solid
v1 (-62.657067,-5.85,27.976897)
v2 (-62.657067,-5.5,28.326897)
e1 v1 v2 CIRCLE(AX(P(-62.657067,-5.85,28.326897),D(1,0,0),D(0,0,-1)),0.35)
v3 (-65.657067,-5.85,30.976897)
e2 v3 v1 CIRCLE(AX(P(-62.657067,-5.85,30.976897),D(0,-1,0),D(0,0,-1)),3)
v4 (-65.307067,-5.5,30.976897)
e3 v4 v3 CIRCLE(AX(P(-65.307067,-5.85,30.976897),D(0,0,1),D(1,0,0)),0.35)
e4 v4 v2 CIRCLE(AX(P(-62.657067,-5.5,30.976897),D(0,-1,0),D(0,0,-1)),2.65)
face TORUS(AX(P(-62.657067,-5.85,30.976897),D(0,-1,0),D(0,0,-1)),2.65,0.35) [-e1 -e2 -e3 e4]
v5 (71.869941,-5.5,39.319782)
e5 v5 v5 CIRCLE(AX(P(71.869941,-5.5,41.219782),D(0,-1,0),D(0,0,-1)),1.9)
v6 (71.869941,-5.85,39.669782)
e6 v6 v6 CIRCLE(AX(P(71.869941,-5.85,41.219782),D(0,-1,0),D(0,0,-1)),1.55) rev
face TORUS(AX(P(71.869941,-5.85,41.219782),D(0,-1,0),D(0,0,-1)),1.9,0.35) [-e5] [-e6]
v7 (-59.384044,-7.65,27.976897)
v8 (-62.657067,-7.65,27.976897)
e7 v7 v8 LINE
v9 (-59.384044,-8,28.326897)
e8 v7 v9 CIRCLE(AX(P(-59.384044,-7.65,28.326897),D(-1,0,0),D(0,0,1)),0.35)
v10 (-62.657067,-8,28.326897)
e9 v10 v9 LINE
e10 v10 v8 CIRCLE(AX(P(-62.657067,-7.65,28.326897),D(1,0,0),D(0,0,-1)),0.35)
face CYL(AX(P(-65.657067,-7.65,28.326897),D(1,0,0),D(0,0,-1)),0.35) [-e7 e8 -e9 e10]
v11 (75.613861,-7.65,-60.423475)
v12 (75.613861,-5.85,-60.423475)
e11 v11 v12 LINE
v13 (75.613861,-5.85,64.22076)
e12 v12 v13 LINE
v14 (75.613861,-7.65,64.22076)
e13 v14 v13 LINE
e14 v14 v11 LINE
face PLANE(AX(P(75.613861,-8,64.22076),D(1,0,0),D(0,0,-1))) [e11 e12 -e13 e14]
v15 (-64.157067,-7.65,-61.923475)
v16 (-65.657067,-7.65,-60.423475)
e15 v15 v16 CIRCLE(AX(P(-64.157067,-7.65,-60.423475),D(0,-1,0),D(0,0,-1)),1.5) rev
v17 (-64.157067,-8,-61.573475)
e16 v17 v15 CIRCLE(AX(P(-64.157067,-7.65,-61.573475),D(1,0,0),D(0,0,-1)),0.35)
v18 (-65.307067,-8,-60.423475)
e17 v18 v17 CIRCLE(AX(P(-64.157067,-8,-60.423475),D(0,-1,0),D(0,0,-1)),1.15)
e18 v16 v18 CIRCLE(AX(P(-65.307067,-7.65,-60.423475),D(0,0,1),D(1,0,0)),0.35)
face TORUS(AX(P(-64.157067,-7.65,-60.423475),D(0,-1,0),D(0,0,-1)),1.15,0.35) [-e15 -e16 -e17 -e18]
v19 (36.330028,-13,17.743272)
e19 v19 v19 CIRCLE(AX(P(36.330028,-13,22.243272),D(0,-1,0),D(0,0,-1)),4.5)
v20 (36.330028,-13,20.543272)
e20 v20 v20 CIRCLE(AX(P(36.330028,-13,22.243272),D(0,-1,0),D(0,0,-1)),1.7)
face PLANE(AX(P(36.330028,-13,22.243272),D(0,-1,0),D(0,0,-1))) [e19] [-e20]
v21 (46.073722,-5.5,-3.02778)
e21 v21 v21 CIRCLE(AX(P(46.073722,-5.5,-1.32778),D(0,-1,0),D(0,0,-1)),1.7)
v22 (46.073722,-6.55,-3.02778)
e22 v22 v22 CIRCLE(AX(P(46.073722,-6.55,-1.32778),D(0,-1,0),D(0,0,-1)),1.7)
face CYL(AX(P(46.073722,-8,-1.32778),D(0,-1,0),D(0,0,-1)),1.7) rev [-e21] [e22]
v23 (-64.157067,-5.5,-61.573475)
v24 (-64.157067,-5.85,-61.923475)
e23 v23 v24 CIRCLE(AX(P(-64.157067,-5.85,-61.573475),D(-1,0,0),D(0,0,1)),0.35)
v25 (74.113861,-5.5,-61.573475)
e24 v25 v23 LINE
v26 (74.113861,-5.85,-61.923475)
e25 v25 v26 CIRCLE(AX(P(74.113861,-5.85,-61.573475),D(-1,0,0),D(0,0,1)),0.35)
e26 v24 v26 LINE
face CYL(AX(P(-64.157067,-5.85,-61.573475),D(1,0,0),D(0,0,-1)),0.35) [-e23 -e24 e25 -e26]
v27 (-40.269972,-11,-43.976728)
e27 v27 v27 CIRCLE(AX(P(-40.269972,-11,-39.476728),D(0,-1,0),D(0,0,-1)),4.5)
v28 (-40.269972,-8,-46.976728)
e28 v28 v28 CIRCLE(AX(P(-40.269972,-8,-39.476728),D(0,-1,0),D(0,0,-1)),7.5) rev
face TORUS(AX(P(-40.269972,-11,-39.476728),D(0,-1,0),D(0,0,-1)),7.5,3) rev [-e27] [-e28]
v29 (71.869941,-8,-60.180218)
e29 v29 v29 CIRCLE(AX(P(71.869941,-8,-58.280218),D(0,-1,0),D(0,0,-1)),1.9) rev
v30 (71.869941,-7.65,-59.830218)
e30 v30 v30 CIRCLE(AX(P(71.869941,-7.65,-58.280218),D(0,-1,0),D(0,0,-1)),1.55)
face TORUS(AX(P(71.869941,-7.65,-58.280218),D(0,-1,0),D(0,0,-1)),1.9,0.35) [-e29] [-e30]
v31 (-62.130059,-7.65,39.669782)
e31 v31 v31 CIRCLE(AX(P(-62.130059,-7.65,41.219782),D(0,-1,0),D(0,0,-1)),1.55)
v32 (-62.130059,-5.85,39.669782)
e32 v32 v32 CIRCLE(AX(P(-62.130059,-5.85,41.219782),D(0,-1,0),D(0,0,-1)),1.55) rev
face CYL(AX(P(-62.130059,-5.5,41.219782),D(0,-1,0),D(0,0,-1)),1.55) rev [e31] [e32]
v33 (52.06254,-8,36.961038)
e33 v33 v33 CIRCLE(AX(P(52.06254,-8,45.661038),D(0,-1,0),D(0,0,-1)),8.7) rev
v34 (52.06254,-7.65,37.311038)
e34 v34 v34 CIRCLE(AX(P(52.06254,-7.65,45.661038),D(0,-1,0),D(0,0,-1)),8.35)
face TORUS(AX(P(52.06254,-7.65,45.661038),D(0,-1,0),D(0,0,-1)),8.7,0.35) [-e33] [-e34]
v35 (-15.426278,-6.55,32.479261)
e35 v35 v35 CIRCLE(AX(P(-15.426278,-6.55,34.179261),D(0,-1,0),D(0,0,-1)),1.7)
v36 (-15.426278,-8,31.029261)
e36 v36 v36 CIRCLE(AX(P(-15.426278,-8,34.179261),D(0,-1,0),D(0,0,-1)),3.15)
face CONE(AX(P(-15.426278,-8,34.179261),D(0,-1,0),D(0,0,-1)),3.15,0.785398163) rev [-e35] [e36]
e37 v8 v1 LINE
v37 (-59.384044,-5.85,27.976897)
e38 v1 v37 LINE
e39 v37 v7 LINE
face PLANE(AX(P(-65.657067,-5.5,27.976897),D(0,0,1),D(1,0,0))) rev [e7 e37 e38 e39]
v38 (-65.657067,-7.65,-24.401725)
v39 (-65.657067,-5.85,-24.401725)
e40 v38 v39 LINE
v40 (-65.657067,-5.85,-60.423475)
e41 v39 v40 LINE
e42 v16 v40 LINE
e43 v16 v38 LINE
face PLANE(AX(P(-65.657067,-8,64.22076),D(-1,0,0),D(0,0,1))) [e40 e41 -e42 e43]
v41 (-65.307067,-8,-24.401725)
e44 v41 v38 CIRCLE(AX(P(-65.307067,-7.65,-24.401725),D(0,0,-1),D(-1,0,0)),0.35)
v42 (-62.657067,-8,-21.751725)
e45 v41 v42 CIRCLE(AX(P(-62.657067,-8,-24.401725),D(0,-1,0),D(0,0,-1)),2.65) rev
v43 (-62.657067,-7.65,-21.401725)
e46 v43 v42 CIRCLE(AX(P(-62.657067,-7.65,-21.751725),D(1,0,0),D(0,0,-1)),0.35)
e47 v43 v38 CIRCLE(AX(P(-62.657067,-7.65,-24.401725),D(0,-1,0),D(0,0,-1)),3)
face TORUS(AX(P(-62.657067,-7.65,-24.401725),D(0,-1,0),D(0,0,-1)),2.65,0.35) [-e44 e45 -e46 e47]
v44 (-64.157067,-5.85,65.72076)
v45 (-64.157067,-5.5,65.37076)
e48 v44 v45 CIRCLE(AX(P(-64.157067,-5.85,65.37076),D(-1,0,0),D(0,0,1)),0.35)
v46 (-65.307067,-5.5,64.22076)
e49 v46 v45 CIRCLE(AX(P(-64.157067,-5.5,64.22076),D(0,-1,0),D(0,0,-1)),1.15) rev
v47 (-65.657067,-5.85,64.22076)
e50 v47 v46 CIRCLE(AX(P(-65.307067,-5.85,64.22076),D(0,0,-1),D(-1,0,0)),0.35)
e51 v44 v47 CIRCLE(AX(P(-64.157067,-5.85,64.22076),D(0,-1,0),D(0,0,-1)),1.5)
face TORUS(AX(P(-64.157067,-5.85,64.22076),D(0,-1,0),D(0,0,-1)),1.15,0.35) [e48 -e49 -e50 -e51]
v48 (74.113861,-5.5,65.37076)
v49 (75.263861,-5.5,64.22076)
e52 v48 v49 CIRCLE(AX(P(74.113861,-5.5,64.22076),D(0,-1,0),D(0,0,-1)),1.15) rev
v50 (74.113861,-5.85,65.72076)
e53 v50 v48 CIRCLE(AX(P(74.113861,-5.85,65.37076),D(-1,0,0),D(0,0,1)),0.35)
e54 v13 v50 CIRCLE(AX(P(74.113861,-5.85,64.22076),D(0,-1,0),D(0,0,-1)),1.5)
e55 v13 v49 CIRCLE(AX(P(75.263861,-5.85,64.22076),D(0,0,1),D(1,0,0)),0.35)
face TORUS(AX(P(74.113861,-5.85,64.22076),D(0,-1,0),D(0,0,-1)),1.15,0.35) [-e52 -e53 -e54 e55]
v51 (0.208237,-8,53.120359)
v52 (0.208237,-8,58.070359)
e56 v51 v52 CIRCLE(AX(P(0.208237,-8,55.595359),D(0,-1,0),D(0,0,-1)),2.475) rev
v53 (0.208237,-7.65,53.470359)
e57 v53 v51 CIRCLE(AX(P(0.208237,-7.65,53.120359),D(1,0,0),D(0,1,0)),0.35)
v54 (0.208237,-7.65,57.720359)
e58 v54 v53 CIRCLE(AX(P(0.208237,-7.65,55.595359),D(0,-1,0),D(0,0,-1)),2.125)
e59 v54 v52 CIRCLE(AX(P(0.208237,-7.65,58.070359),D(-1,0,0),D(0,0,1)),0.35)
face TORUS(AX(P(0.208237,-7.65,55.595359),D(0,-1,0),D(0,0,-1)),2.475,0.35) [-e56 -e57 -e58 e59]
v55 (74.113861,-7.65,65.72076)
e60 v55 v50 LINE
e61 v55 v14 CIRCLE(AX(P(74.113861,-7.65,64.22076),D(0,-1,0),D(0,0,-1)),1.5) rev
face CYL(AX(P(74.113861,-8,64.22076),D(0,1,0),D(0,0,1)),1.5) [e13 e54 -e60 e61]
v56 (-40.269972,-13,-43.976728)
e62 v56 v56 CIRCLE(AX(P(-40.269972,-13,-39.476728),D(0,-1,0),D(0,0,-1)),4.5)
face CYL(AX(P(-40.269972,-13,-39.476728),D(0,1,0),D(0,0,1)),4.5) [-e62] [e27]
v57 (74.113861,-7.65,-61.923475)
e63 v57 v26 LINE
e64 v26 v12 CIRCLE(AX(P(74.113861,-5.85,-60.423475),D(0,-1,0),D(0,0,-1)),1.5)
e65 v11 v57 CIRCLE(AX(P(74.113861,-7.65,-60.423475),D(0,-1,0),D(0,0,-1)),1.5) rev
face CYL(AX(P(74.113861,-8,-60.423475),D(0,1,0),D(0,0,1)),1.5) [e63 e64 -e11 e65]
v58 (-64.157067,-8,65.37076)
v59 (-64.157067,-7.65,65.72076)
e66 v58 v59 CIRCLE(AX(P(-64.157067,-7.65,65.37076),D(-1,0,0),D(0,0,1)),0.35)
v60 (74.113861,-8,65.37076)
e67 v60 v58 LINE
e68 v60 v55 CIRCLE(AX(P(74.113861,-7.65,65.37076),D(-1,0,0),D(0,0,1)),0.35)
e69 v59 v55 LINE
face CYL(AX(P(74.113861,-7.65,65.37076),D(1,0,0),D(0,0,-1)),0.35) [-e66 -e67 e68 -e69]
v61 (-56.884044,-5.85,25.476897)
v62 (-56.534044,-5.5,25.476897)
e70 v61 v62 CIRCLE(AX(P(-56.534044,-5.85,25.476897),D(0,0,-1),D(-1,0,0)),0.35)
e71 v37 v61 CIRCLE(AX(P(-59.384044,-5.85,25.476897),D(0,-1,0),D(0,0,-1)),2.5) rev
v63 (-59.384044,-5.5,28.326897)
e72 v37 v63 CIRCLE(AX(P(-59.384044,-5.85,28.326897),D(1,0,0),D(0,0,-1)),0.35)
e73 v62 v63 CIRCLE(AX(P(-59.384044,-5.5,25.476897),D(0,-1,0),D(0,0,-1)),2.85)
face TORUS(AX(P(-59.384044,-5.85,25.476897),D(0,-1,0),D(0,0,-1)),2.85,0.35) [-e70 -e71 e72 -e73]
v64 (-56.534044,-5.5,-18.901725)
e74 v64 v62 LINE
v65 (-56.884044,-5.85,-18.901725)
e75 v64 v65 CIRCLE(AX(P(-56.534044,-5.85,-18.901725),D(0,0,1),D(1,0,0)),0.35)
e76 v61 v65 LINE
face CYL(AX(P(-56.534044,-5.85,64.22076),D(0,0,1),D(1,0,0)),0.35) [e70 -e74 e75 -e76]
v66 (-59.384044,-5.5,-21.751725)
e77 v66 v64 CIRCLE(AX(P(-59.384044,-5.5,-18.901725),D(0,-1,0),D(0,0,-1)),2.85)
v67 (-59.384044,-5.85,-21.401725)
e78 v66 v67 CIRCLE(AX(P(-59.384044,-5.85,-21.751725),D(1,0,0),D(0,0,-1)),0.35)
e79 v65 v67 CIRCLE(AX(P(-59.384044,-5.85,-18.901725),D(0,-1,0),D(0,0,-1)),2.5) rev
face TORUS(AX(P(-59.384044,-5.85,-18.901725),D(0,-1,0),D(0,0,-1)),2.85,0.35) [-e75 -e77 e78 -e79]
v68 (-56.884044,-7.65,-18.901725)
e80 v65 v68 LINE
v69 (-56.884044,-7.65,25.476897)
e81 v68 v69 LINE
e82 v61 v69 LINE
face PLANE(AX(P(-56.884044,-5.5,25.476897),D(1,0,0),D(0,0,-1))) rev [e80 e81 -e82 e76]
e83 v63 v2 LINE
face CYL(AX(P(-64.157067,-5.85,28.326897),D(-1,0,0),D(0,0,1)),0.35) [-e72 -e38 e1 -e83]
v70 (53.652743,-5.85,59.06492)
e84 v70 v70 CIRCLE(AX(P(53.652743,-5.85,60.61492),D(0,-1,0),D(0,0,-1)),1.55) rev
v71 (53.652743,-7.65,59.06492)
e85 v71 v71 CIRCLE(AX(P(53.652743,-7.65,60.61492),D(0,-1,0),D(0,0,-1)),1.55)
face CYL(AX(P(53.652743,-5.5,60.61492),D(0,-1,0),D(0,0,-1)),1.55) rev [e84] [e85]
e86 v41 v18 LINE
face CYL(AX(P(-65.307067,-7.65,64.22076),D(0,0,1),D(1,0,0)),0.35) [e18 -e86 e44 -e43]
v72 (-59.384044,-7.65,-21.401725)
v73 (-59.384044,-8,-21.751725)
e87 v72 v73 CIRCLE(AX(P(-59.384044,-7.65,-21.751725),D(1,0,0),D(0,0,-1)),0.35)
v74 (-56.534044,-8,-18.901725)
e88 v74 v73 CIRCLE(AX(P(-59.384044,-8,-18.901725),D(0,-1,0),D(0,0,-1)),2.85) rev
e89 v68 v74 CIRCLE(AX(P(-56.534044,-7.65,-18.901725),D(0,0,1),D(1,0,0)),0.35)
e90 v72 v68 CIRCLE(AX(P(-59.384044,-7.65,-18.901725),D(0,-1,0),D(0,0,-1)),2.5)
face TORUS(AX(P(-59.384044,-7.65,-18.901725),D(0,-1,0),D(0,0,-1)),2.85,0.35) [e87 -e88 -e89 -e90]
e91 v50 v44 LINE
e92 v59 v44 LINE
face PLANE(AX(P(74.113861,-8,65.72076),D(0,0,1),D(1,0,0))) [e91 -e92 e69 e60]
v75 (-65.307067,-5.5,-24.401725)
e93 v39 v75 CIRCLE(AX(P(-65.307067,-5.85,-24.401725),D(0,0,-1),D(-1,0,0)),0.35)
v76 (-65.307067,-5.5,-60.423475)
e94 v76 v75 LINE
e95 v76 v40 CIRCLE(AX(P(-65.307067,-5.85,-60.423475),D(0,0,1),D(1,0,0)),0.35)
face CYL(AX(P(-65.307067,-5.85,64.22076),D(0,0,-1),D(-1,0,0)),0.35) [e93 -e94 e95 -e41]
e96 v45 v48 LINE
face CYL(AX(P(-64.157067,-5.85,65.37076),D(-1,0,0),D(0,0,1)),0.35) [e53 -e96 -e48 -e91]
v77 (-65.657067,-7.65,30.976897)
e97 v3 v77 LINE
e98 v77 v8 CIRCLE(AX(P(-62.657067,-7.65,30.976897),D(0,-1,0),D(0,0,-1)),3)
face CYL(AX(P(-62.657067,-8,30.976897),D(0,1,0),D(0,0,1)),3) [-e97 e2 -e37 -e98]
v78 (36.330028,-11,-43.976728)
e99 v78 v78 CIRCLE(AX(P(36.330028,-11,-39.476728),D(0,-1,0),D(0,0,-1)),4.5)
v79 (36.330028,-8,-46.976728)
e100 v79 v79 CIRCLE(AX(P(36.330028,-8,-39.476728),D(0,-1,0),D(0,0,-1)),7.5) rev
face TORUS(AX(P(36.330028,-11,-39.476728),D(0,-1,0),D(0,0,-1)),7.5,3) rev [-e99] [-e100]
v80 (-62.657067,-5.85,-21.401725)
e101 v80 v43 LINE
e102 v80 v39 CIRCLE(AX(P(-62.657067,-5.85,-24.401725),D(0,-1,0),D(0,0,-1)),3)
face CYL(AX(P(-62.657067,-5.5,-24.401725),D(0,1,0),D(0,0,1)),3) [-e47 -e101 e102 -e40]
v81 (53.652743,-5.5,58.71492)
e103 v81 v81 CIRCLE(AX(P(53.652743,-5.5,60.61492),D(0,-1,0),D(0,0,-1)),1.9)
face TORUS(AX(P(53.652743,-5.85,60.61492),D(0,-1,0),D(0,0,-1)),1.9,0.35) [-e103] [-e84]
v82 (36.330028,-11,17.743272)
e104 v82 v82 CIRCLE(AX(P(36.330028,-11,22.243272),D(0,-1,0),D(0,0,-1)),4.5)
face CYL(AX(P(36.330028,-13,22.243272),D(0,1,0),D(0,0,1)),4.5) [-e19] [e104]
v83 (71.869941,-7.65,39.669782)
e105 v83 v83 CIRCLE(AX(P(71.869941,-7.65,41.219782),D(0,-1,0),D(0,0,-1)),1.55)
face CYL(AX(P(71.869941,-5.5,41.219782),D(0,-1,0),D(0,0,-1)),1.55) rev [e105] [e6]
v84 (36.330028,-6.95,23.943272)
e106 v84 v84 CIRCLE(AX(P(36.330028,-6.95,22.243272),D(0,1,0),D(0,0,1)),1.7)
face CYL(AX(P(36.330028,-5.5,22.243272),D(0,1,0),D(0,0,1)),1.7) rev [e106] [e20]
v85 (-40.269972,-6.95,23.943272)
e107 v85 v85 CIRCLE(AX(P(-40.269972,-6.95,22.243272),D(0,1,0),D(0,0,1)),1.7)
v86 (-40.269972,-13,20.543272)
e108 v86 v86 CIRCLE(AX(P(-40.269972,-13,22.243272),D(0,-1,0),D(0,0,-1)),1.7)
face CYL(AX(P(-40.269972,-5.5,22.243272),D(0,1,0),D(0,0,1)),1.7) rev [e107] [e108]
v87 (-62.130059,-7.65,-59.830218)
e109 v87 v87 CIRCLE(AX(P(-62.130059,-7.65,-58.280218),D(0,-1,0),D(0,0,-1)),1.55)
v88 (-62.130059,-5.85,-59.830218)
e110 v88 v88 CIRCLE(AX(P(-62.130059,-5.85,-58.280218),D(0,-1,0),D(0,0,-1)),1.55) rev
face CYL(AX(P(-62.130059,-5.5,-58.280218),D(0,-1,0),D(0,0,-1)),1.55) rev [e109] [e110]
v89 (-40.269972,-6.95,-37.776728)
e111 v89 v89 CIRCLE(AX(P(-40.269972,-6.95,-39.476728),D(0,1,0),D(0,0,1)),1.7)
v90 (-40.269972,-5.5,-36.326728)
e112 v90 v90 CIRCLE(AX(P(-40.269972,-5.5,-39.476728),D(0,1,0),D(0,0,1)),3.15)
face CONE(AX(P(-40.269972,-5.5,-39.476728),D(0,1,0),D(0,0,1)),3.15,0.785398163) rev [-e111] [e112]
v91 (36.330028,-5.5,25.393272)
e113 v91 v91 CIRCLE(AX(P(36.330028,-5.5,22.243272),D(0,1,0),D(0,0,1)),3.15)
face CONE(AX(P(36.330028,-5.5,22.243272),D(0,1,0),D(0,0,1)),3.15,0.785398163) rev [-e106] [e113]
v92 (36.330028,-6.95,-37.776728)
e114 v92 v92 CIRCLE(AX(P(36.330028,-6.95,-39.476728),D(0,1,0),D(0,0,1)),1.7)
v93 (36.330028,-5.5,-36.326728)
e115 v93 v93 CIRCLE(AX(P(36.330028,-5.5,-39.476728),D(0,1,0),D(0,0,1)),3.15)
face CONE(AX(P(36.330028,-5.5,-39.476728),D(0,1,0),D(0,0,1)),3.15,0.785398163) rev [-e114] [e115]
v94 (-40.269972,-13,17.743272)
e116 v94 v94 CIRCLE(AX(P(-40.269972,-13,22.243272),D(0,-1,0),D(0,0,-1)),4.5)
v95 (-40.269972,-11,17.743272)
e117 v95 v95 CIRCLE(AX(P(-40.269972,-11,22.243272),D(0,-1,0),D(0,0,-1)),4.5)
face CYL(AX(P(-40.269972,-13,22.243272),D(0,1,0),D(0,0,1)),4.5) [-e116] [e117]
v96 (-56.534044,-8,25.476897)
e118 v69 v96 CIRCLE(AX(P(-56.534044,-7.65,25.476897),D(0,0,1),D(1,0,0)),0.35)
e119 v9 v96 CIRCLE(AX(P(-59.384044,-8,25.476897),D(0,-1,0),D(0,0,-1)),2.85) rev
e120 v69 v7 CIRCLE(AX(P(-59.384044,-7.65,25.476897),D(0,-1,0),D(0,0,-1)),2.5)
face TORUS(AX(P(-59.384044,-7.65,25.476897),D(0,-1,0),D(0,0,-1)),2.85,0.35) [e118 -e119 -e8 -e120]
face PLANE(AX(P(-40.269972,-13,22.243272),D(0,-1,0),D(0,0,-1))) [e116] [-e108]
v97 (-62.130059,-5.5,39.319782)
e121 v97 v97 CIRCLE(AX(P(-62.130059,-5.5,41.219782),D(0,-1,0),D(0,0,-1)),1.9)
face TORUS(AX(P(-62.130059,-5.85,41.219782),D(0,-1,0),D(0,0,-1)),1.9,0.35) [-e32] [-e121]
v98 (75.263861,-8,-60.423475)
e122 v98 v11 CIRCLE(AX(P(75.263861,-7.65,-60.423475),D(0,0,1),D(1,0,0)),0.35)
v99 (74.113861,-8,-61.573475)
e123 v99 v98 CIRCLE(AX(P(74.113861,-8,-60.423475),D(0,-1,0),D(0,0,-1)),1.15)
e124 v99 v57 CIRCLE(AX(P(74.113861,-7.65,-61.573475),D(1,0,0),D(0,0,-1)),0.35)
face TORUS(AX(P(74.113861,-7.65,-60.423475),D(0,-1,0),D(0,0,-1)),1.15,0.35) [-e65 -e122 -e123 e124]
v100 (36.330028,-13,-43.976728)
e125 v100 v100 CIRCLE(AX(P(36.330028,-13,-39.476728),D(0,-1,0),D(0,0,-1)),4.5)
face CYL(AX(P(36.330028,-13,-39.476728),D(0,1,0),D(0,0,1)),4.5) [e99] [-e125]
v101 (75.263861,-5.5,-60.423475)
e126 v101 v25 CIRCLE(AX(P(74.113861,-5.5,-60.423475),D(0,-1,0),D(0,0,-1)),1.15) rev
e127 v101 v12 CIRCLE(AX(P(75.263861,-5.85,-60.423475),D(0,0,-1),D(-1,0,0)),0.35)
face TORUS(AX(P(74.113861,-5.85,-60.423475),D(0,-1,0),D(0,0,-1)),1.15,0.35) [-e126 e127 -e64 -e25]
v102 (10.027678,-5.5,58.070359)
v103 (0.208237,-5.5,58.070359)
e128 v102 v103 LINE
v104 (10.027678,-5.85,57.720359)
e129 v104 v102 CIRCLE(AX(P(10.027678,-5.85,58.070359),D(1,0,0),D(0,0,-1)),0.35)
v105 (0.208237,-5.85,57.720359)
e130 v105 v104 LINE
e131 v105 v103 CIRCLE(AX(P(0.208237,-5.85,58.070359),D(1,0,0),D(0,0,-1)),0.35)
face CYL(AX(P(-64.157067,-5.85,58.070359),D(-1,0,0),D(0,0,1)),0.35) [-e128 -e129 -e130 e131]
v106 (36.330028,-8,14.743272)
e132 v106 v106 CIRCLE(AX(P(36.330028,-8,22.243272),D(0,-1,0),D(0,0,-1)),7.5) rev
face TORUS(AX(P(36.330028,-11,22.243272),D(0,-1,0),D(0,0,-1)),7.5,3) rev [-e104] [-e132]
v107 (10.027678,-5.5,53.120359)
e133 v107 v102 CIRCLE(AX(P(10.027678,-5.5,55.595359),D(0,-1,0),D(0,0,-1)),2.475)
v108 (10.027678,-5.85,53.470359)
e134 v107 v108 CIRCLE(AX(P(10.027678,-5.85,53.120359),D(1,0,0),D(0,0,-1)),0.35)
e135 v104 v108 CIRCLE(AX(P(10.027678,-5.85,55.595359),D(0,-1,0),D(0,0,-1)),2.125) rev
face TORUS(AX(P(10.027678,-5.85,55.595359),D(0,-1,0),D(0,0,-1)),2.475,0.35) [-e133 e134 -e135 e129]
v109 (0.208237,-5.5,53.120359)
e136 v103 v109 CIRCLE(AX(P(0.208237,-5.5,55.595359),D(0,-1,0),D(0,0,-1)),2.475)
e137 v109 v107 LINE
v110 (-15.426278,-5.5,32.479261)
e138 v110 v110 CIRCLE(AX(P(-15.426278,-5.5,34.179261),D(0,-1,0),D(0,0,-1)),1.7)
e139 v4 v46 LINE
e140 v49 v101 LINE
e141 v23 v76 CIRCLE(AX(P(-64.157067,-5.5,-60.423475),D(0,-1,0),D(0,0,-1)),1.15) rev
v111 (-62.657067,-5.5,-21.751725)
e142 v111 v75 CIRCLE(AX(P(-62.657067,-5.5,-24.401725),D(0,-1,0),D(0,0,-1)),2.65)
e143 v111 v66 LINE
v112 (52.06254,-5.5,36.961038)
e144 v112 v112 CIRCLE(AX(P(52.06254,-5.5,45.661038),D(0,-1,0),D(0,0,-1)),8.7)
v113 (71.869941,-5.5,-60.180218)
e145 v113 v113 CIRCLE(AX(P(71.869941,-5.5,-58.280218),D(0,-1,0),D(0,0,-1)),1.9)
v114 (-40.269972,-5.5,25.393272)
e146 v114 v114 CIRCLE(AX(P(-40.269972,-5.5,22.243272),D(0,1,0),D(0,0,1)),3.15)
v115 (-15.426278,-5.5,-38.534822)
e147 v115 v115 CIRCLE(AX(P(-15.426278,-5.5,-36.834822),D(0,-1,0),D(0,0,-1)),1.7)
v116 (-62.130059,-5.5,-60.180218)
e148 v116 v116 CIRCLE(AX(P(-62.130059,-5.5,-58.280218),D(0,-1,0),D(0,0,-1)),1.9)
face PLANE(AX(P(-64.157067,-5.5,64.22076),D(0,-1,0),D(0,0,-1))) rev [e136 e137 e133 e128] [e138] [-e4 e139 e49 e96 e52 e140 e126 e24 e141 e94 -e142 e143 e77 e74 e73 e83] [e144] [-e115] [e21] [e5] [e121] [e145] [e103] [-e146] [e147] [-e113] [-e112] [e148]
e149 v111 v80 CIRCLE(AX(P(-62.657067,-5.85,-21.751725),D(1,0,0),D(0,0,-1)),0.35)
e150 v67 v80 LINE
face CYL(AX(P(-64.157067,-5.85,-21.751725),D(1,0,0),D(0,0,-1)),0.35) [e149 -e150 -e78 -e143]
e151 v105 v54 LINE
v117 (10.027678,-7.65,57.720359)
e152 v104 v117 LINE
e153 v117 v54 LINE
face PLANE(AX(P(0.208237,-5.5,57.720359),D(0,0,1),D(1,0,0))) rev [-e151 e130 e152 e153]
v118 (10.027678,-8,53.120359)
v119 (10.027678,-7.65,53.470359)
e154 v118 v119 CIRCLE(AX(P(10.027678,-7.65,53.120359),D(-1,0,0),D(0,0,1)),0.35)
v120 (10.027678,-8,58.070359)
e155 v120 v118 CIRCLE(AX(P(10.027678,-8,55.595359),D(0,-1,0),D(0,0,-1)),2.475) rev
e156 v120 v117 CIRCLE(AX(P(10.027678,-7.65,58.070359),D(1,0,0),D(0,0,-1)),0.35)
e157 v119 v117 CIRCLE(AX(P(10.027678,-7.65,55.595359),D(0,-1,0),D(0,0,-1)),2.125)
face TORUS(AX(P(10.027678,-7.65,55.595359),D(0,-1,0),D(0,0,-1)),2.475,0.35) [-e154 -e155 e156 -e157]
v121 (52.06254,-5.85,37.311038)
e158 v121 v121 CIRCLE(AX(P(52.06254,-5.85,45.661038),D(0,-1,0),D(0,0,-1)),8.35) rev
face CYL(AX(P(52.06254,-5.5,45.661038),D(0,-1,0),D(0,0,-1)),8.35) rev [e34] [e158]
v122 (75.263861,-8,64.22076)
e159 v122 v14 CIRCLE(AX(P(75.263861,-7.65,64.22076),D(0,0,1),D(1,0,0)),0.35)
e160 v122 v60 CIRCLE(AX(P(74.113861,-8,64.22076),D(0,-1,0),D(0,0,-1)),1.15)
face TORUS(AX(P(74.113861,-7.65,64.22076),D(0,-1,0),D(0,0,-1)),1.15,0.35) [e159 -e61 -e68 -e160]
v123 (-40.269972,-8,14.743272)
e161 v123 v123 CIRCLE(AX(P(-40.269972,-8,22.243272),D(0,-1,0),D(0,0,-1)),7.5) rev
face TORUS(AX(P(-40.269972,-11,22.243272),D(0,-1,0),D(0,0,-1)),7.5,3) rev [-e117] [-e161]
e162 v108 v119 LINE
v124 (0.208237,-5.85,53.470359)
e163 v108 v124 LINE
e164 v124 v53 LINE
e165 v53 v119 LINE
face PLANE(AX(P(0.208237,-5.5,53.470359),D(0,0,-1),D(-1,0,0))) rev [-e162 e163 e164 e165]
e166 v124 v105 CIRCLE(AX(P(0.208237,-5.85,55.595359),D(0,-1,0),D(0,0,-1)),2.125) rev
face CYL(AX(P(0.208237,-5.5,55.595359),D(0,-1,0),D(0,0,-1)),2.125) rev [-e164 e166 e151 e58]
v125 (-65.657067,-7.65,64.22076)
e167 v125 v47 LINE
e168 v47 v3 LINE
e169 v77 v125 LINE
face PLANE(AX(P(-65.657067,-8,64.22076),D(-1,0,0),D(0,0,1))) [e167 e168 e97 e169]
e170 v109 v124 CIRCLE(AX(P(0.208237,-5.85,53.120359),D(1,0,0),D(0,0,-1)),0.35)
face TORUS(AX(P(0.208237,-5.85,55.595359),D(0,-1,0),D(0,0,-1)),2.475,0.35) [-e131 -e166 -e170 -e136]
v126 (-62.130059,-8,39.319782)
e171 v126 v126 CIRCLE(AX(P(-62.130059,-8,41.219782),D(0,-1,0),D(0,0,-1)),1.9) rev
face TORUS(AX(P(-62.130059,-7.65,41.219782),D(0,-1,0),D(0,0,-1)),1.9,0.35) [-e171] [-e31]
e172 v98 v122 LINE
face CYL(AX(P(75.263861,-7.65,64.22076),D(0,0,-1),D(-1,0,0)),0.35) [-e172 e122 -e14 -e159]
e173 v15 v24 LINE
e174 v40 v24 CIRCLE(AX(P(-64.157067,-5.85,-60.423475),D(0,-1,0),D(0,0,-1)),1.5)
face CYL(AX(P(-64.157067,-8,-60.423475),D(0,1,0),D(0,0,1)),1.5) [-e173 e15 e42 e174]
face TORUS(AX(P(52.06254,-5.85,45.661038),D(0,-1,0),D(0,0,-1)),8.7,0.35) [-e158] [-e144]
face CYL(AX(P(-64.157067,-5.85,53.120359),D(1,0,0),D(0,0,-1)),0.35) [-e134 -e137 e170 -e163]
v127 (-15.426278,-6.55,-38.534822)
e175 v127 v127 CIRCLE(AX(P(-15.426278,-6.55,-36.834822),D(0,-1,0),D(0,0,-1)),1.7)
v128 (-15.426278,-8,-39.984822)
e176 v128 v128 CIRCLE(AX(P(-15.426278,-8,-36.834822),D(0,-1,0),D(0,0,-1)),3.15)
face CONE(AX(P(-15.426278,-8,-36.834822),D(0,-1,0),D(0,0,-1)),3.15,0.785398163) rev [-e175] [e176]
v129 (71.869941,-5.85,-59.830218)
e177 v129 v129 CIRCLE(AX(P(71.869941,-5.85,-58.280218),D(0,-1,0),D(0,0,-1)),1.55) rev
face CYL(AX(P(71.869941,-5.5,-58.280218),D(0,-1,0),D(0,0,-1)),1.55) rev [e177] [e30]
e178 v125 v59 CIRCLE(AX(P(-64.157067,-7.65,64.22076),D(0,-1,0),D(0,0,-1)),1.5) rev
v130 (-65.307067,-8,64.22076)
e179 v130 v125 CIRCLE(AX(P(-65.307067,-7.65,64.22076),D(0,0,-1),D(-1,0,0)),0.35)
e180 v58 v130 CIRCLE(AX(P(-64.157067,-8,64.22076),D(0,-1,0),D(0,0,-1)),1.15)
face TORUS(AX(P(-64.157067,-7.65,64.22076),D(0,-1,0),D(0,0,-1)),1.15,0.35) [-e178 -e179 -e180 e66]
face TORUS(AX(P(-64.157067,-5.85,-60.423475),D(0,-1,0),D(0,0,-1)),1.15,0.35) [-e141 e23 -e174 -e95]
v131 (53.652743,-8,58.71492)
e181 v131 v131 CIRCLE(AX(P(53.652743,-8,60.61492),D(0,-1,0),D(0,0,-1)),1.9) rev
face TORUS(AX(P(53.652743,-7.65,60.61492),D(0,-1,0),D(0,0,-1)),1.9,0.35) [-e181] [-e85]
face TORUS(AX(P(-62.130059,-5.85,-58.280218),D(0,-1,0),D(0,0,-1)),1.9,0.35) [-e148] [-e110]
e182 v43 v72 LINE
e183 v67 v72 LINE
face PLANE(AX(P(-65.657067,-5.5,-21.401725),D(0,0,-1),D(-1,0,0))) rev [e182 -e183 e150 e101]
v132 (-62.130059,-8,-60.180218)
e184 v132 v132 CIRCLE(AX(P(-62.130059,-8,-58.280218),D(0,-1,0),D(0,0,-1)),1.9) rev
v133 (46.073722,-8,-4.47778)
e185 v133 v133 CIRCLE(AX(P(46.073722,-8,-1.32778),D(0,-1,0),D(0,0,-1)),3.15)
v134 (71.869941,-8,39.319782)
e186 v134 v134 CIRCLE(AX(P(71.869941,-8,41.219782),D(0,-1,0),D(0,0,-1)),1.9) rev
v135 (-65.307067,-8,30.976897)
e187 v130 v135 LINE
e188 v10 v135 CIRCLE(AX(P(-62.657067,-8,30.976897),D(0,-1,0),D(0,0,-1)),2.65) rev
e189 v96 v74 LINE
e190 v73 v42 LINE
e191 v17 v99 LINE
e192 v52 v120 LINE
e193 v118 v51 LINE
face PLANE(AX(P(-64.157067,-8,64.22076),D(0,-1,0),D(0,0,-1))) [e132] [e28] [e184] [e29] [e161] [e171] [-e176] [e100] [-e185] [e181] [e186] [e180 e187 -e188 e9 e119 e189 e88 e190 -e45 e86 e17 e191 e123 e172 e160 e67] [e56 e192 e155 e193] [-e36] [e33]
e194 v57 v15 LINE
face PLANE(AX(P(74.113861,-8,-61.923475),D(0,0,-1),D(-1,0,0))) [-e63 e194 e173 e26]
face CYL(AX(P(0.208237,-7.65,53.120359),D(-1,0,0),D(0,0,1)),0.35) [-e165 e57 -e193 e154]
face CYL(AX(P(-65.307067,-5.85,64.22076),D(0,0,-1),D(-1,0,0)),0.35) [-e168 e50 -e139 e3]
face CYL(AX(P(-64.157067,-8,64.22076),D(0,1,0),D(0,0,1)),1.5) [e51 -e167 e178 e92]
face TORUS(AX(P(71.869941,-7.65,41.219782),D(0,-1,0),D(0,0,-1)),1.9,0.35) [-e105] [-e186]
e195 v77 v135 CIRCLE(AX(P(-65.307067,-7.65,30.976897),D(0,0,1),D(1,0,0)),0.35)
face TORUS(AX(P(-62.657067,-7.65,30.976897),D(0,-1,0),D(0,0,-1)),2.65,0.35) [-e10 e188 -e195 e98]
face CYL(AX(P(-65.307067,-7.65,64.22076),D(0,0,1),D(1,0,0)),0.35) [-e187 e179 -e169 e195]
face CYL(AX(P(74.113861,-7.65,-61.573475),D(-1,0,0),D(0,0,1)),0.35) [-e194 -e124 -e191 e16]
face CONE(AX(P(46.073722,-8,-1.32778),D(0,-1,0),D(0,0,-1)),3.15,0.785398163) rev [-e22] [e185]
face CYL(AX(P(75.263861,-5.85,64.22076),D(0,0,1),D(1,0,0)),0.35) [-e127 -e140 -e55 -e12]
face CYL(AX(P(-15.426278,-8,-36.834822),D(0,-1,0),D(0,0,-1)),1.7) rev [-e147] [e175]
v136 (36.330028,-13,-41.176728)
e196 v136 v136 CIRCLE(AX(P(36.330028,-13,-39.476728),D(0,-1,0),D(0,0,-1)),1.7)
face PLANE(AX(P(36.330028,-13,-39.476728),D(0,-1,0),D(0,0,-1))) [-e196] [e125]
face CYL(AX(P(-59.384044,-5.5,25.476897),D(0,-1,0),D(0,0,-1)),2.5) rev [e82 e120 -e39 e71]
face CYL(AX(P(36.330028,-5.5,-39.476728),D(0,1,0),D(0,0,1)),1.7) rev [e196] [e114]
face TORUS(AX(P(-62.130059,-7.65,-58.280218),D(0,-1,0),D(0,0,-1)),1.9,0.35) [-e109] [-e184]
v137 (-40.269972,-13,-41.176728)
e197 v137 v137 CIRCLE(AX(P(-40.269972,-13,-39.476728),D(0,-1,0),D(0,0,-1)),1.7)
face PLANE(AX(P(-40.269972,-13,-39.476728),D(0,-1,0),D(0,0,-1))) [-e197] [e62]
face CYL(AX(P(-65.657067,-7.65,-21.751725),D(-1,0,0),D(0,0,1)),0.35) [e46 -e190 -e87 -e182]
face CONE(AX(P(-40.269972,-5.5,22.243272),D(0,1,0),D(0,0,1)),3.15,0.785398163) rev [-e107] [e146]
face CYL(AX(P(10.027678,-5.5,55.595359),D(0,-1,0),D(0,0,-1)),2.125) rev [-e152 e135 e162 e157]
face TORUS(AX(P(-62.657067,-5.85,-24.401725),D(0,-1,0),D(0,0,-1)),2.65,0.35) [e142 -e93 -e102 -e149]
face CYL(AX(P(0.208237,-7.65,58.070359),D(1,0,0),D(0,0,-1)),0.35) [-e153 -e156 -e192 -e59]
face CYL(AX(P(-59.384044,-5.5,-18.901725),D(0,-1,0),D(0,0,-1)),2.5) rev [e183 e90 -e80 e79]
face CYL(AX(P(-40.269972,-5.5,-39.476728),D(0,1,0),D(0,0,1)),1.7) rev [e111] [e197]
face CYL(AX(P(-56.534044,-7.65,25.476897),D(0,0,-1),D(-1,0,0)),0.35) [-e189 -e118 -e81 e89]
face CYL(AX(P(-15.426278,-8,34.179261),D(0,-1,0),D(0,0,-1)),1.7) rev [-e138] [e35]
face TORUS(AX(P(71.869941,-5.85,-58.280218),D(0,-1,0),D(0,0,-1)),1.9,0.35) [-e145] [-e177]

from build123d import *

# Parameters (mm, degrees)
BOSS_EXTRUDE1_START                            = -5.5
BOSS_EXTRUDE1_DEPTH                            = 2.5
SKETCH2_R                                      = 1.55
SKETCH2_R_2                                    = 8.35
SKETCH2_R_3                                    = 0.25
CUT_EXTRUDE5_DEPTH                             = 2.5
FILLET1_R                                      = 0.35
CSK_FOR_M3_FLAT_HEAD_MACHINE_SCREW1_AT_2_COUNT = 2
CSK_FOR_M3_FLAT_HEAD_MACHINE_SCREW1_AT_2_PITCH = 76.6
CSK_FOR_M3_FLAT_HEAD_MACHINE_SCREW1_AT_3_COUNT = 2
CSK_FOR_M3_FLAT_HEAD_MACHINE_SCREW1_AT_3_PITCH = 98.371329156
CSK_FOR_M3_FLAT_HEAD_MACHINE_SCREW1_AT_4_COUNT = 2
CSK_FOR_M3_FLAT_HEAD_MACHINE_SCREW1_AT_4_PITCH = 61.720000004
SKETCH9_R                                      = 0.25
CUT_EXTRUDE7_DEPTH                             = 101.214391699
CSK_FOR_M3_FLAT_HEAD_MACHINE_SCREW2_AT_2_COUNT = 2
CSK_FOR_M3_FLAT_HEAD_MACHINE_SCREW2_AT_2_PITCH = 71.01408311
CSK_FOR_M3_FLAT_HEAD_MACHINE_SCREW2_AT_3_COUNT = 2
CSK_FOR_M3_FLAT_HEAD_MACHINE_SCREW2_AT_3_PITCH = 71.01408311
FILLET2_R                                      = 3
SKETCH17_R                                     = 4.5
SKETCH17_R_2                                   = 1.7
BOSS_EXTRUDE2_DEPTH                            = 5
FILLET3_R                                      = 3


with BuildPart() as part:
    # Sketch1 → Boss-Extrude1 (new body)
    with BuildSketch(Plane(origin=(0, 0, 0), x_dir=(1, 0, 0), z_dir=(0, 1, 0)).offset(BOSS_EXTRUDE1_START)):
        with BuildLine():
            Line((74.113861426, -65.72075976), (-64.157066783, -65.72075976))
            ThreePointArc((-64.157066783, -65.72075976), (-65.217726955, -65.281419931), (-65.657066783, -64.22075976))
            Line((-65.657066783, -64.22075976), (-65.657066783, 60.423475085))
            ThreePointArc((-65.657066783, 60.423475085), (-65.217726955, 61.484135257), (-64.157066783, 61.923475085))
            Line((-64.157066783, 61.923475085), (74.113861426, 61.923475085))
            ThreePointArc((74.113861426, 61.923475085), (75.174521598, 61.484135257), (75.613861426, 60.423475085))
            Line((75.613861426, 60.423475085), (75.613861426, -64.22075976))
            ThreePointArc((75.613861426, -64.22075976), (75.174521598, -65.281419931), (74.113861426, -65.72075976))
        make_face()
    extrude(amount=-BOSS_EXTRUDE1_DEPTH)

    # Sketch2 → Cut-Extrude5 (cut)
    with BuildSketch(Plane(origin=(0, -8, 0), x_dir=(-1, 0, 0), z_dir=(0, -1, 0))):
        with Locations(Location((62.130058611, -41.219781732, 0), (0, 0, 90))):
            Circle(SKETCH2_R)
        with Locations(Location((-71.869941389, -41.219781732, 0), (0, 0, 90))):
            Circle(SKETCH2_R)
        with Locations(Location((-71.869941389, 58.280218268, 0), (0, 0, 90))):
            Circle(SKETCH2_R)
        with Locations(Location((62.130058611, 58.280218268, 0), (0, 0, 90))):
            Circle(SKETCH2_R)
        with Locations(Location((-53.652742829, -60.614920028, 0), (0, 0, 90))):
            Circle(SKETCH2_R)
        with Locations(Location((-52.062540252, -45.661038294, 0), (0, 0, 90))):
            Circle(SKETCH2_R_2)
        with Locations(Location((-36.330028462, 39.476727654, 0), (0, 0, 90))):
            Circle(SKETCH2_R_3)
        with Locations(Location((40.269971538, 39.476727654, 0), (0, 0, 90))):
            Circle(SKETCH2_R_3)
        with Locations(Location((40.269971538, -22.243272346, 0), (0, 0, 90))):
            Circle(SKETCH2_R_3)
        with Locations(Location((-36.330028462, -22.24327235, 0), (0, 0, 90))):
            Circle(SKETCH2_R_3)
        with BuildLine():
            Line((-0.208237226, -57.72035864), (-10.027678184, -57.72035864))
            ThreePointArc((-10.027678184, -57.72035864), (-12.152678184, -55.59535864), (-10.027678184, -53.47035864))
            Line((-10.027678184, -53.47035864), (-0.208237226, -53.47035864))
            ThreePointArc((-0.208237226, -53.47035864), (1.916762774, -55.59535864), (-0.208237226, -57.72035864))
        make_face()
        with BuildLine():
            Line((65.657066783, -27.976897452), (59.384043685, -27.976897452))
            ThreePointArc((59.384043685, -27.976897452), (57.616276732, -27.244664405), (56.884043685, -25.476897452))
            Line((56.884043685, -25.476897452), (56.884043685, 18.901725122))
            ThreePointArc((56.884043685, 18.901725122), (57.616276732, 20.669492075), (59.384043685, 21.401725122))
            Line((59.384043685, 21.401725122), (65.657066783, 21.401725122))
            Line((65.657066783, 21.401725122), (65.657066783, -27.976897452))
        make_face()
    extrude(amount=-CUT_EXTRUDE5_DEPTH, mode=Mode.SUBTRACT)

    # Fillet1
    fillet1_edges = [part.edges().sort_by_distance(p)[0] for p in [
        (75.174521598, -8, 65.281419931),
        (4.978397322, -5.5, 65.72075976),
        (-65.217726955, -5.5, 65.281419931),
        (75.613861426, -8, 1.898642337),
        (75.174521598, -8, -61.484135257),
        (4.978397322, -8, -61.923475085),
        (-65.217726955, -8, -61.484135257),
        (-65.657066783, -5.5, 46.098828606),
        (-65.657066783, -8, -40.912600104),
        (-65.657066783, -8, 46.098828606),
        (-65.217726955, -8, 65.281419931),
        (36.330028462, -5.5, -39.226727654),
        (36.330028462, -8, -39.226727654),
        (-1.916762774, -5.5, 55.59535864),
        (5.117957705, -5.5, 57.72035864),
        (12.152678184, -5.5, 55.59535864),
        (5.117957705, -5.5, 53.47035864),
        (-1.916762774, -8, 55.59535864),
        (5.117957705, -8, 53.47035864),
        (12.152678184, -8, 55.59535864),
        (5.117957705, -8, 57.72035864),
        (52.062540252, -5.5, 54.011038294),
        (52.062540252, -8, 54.011038294),
        (53.652742829, -5.5, 62.164920028),
        (53.652742829, -8, 62.164920028),
        (-62.130058611, -5.5, -56.730218268),
        (-62.130058611, -8, -56.730218268),
        (71.869941389, -5.5, -56.730218268),
        (71.869941389, -8, -56.730218268),
        (71.869941389, -5.5, 42.769781732),
        (71.869941389, -8, 42.769781732),
        (-62.520555234, -5.5, 27.976897452),
        (-57.616276732, -5.5, 27.244664405),
        (-56.884043685, -5.5, 3.287586165),
        (-57.616276732, -5.5, -20.669492075),
        (-62.520555234, -5.5, -21.401725122),
        (-62.520555234, -8, -21.401725122),
        (-57.616276732, -8, -20.669492075),
        (-56.884043685, -8, 3.287586165),
        (-57.616276732, -8, 27.244664405),
        (-62.520555234, -8, 27.976897452),
        (4.978397322, -8, 65.72075976),
        (-40.269971538, -5.5, -39.226727654),
        (-40.269971538, -8, -39.226727654),
        (-40.269971538, -5.5, 22.493272346),
        (-40.269971538, -8, 22.493272346),
        (36.330028462, -5.5, 22.49327235),
        (36.330028462, -8, 22.49327235),
        (-62.130058611, -5.5, 42.769781732),
        (-62.130058611, -8, 42.769781732),
        (-65.657066783, -5.5, -40.912600104),
        (-65.217726955, -5.5, -61.484135257),
        (4.978397322, -5.5, -61.923475085),
        (75.174521598, -5.5, -61.484135257),
        (75.613861426, -5.5, 1.898642337),
        (75.174521598, -5.5, 65.281419931),
    ]]
    fillet(fillet1_edges, radius=FILLET1_R)

    # Sketch6 → CSK for M3 Flat Head Machine Screw1 (revolve, cut)
    with BuildSketch(Plane(origin=(36.330028462, -5.5, -39.476727654), x_dir=(0, 0, 1), z_dir=(1, 0, 0))):
        Polygon((0, 0), (0, 2.5), (1.7, 2.5), (1.7, 1.45), (3.15, 0), align=None)
    csk_for_m3_flat_head_machine_screw1 = revolve(axis=Axis((36.330028462, 0.85, -39.476727654), (0, -1, 0)), mode=Mode.SUBTRACT)

    # CSK for M3 Flat Head Machine Screw1 at 2: CSK for M3 Flat Head Machine Screw1 ×2
    with Locations(*[(-i * CSK_FOR_M3_FLAT_HEAD_MACHINE_SCREW1_AT_2_PITCH, 0, 0) for i in range(1, CSK_FOR_M3_FLAT_HEAD_MACHINE_SCREW1_AT_2_COUNT)]):
        add(csk_for_m3_flat_head_machine_screw1, mode=Mode.SUBTRACT)

    # CSK for M3 Flat Head Machine Screw1 at 3: CSK for M3 Flat Head Machine Screw1 ×2
    with Locations(*[Vector(-0.7786821694581578, 0, 0.627418583537288) * (i * CSK_FOR_M3_FLAT_HEAD_MACHINE_SCREW1_AT_3_PITCH) for i in range(1, CSK_FOR_M3_FLAT_HEAD_MACHINE_SCREW1_AT_3_COUNT)]):
        add(csk_for_m3_flat_head_machine_screw1, mode=Mode.SUBTRACT)

    # CSK for M3 Flat Head Machine Screw1 at 4: CSK for M3 Flat Head Machine Screw1 ×2
    with Locations(*[(0, 0, i * CSK_FOR_M3_FLAT_HEAD_MACHINE_SCREW1_AT_4_PITCH) for i in range(1, CSK_FOR_M3_FLAT_HEAD_MACHINE_SCREW1_AT_4_COUNT)]):
        add(csk_for_m3_flat_head_machine_screw1, mode=Mode.SUBTRACT)

    # Sketch9 → Cut-Extrude7 (cut, through all)
    with BuildSketch(Plane(origin=(0, -5.5, 0), x_dir=(1, 0, 0), z_dir=(0, 1, 0))):
        with Locations(Location((46.073721835, 1.327780123, 0), (0, 0, 270))):
            Circle(SKETCH9_R)
        with Locations(Location((-15.426278165, -34.179261432, 0), (0, 0, 270))):
            Circle(SKETCH9_R)
        with Locations(Location((-15.426278165, 36.834821679, 0), (0, 0, 270))):
            Circle(SKETCH9_R)
    extrude(amount=-CUT_EXTRUDE7_DEPTH, mode=Mode.SUBTRACT)

    # Sketch15 → CSK for M3 Flat Head Machine Screw2 (revolve, cut)
    with BuildSketch(Plane(origin=(-15.426278165, -8, 34.179261432), x_dir=(0, 0, -1), z_dir=(1, 0, 0))):
        Polygon((0, 0), (0, 2.5), (1.7, 2.5), (1.7, 1.45), (3.15, 0), align=None)
    csk_for_m3_flat_head_machine_screw2 = revolve(axis=Axis((-15.426278165, -14.35, 34.179261432), (0, 1, 0)), mode=Mode.SUBTRACT)

    # CSK for M3 Flat Head Machine Screw2 at 2: CSK for M3 Flat Head Machine Screw2 ×2
    with Locations(*[Vector(0.8660254037844399, 0, -0.4999999999999978) * (i * CSK_FOR_M3_FLAT_HEAD_MACHINE_SCREW2_AT_2_PITCH) for i in range(1, CSK_FOR_M3_FLAT_HEAD_MACHINE_SCREW2_AT_2_COUNT)]):
        add(csk_for_m3_flat_head_machine_screw2, mode=Mode.SUBTRACT)

    # CSK for M3 Flat Head Machine Screw2 at 3: CSK for M3 Flat Head Machine Screw2 ×2
    with Locations(*[(0, 0, -i * CSK_FOR_M3_FLAT_HEAD_MACHINE_SCREW2_AT_3_PITCH) for i in range(1, CSK_FOR_M3_FLAT_HEAD_MACHINE_SCREW2_AT_3_COUNT)]):
        add(csk_for_m3_flat_head_machine_screw2, mode=Mode.SUBTRACT)

    # Fillet2
    # the kernel refuses this fillet: 3 mm, written as the material it takes off along each edge
    with BuildSketch(Plane(origin=(-62.657066783, -8, -24.401725122), x_dir=(0, 0, 1), z_dir=(1, 0, 0))) as fillet2_piece_1:
        with BuildLine():
            CenterArc((2.65, -0.35), 0.35, 0, 90)
            Line((3, -0.35), (3, 0))
            Line((3, 0), (2.65, 0))
        make_face()
    revolve(axis=Axis((-62.657066783, -8, -24.401725122), (0, -1, 0)), revolution_arc=90, mode=Mode.SUBTRACT)
    with BuildSketch(Plane(origin=(-62.657066783, -8, 30.976897452), x_dir=(-1, 0, 0), z_dir=(0, 0, 1))) as fillet2_piece_2:
        with BuildLine():
            CenterArc((2.65, -0.35), 0.35, 0, 90)
            Line((3, -0.35), (3, 0))
            Line((3, 0), (2.65, 0))
        make_face()
    revolve(axis=Axis((-62.657066783, -8, 30.976897452), (0, -1, 0)), revolution_arc=90, mode=Mode.SUBTRACT)
    with BuildSketch(Plane(origin=(-62.657066783, -5.5, -24.401725122), x_dir=(-1, 0, 0), z_dir=(0, 0, -1))) as fillet2_piece_3:
        with BuildLine():
            CenterArc((2.65, -0.35), 0.35, 0, 90)
            Line((3, -0.35), (3, 0))
            Line((3, 0), (2.65, 0))
        make_face()
    revolve(axis=Axis((-62.657066783, -5.5, -24.401725122), (0, 1, 0)), revolution_arc=90, mode=Mode.SUBTRACT)
    with BuildSketch(Plane(origin=(-62.657066783, -5.5, 30.976897452), x_dir=(0, 0, -1), z_dir=(1, 0, 0))) as fillet2_piece_4:
        with BuildLine():
            CenterArc((2.65, -0.35), 0.35, 0, 90)
            Line((3, -0.35), (3, 0))
            Line((3, 0), (2.65, 0))
        make_face()
    revolve(axis=Axis((-62.657066783, -5.5, 30.976897452), (0, 1, 0)), revolution_arc=90, mode=Mode.SUBTRACT)
    with BuildSketch(Plane(origin=(-65.657066783, -8, 27.976897452), x_dir=(0, 0, 1), z_dir=(0, 1, 0))) as fillet2_piece_5:
        with BuildLine():
            CenterArc((FILLET2_R, FILLET2_R), FILLET2_R, 180, 90)
            Line((0, FILLET2_R), (0, 0))
            Line((0, 0), (FILLET2_R, 0))
        make_face()
    extrude(amount=2.5, mode=Mode.SUBTRACT)
    with BuildSketch(Plane(origin=(-65.657066783, -8, -21.401725122), x_dir=(0, 0, -1), z_dir=(0, 1, 0))) as fillet2_piece_6:
        with BuildLine():
            CenterArc((FILLET2_R, -FILLET2_R), FILLET2_R, 90, 90)
            Line((0, -FILLET2_R), (0, 0))
            Line((0, 0), (FILLET2_R, 0))
        make_face()
    extrude(amount=2.5, mode=Mode.SUBTRACT)

    # Sketch17 → Boss-Extrude2 (add)
    # profile 1 of 4: a face of its own
    with BuildSketch(Plane(origin=(0, -8, 0), x_dir=(-1, 0, 0), z_dir=(0, -1, 0))):
        with Locations(Location((-36.330028462, 39.476727654, 0), (0, 0, 90))):
            Circle(SKETCH17_R)
        with Locations(Location((-36.330028462, 39.476727654, 0), (0, 0, 270))):
            Circle(SKETCH17_R_2, mode=Mode.SUBTRACT)
    # profile 2 of 4: a face of its own
    with BuildSketch(Plane(origin=(0, -8, 0), x_dir=(-1, 0, 0), z_dir=(0, -1, 0))):
        with Locations(Location((40.269971538, 39.476727654, 0), (0, 0, 90))):
            Circle(SKETCH17_R)
        with Locations(Location((40.269971538, 39.476727654, 0), (0, 0, 270))):
            Circle(SKETCH17_R_2, mode=Mode.SUBTRACT)
    # profile 3 of 4: a face of its own
    with BuildSketch(Plane(origin=(0, -8, 0), x_dir=(-1, 0, 0), z_dir=(0, -1, 0))):
        with Locations(Location((40.269971538, -22.243272346, 0), (0, 0, 90))):
            Circle(SKETCH17_R)
        with Locations(Location((40.269971538, -22.243272346, 0), (0, 0, 270))):
            Circle(SKETCH17_R_2, mode=Mode.SUBTRACT)
    # profile 4 of 4: a face of its own
    with BuildSketch(Plane(origin=(0, -8, 0), x_dir=(-1, 0, 0), z_dir=(0, -1, 0))):
        with Locations(Location((-36.330028462, -22.243272346, 0), (0, 0, 90))):
            Circle(SKETCH17_R)
        with Locations(Location((-36.330028462, -22.243272346, 0), (0, 0, 270))):
            Circle(SKETCH17_R_2, mode=Mode.SUBTRACT)
    extrude(amount=BOSS_EXTRUDE2_DEPTH)

    # Fillet3
    fillet3_edges = [part.edges().sort_by_distance(p)[0] for p in [
        (36.330028462, -8, -34.976727654),
        (-40.269971538, -8, -34.976727654),
        (-40.269971538, -8, 26.743272346),
        (36.330028462, -8, 26.743272346),
    ]]
    fillet(fillet3_edges, radius=FILLET3_R)


solid = part.part
